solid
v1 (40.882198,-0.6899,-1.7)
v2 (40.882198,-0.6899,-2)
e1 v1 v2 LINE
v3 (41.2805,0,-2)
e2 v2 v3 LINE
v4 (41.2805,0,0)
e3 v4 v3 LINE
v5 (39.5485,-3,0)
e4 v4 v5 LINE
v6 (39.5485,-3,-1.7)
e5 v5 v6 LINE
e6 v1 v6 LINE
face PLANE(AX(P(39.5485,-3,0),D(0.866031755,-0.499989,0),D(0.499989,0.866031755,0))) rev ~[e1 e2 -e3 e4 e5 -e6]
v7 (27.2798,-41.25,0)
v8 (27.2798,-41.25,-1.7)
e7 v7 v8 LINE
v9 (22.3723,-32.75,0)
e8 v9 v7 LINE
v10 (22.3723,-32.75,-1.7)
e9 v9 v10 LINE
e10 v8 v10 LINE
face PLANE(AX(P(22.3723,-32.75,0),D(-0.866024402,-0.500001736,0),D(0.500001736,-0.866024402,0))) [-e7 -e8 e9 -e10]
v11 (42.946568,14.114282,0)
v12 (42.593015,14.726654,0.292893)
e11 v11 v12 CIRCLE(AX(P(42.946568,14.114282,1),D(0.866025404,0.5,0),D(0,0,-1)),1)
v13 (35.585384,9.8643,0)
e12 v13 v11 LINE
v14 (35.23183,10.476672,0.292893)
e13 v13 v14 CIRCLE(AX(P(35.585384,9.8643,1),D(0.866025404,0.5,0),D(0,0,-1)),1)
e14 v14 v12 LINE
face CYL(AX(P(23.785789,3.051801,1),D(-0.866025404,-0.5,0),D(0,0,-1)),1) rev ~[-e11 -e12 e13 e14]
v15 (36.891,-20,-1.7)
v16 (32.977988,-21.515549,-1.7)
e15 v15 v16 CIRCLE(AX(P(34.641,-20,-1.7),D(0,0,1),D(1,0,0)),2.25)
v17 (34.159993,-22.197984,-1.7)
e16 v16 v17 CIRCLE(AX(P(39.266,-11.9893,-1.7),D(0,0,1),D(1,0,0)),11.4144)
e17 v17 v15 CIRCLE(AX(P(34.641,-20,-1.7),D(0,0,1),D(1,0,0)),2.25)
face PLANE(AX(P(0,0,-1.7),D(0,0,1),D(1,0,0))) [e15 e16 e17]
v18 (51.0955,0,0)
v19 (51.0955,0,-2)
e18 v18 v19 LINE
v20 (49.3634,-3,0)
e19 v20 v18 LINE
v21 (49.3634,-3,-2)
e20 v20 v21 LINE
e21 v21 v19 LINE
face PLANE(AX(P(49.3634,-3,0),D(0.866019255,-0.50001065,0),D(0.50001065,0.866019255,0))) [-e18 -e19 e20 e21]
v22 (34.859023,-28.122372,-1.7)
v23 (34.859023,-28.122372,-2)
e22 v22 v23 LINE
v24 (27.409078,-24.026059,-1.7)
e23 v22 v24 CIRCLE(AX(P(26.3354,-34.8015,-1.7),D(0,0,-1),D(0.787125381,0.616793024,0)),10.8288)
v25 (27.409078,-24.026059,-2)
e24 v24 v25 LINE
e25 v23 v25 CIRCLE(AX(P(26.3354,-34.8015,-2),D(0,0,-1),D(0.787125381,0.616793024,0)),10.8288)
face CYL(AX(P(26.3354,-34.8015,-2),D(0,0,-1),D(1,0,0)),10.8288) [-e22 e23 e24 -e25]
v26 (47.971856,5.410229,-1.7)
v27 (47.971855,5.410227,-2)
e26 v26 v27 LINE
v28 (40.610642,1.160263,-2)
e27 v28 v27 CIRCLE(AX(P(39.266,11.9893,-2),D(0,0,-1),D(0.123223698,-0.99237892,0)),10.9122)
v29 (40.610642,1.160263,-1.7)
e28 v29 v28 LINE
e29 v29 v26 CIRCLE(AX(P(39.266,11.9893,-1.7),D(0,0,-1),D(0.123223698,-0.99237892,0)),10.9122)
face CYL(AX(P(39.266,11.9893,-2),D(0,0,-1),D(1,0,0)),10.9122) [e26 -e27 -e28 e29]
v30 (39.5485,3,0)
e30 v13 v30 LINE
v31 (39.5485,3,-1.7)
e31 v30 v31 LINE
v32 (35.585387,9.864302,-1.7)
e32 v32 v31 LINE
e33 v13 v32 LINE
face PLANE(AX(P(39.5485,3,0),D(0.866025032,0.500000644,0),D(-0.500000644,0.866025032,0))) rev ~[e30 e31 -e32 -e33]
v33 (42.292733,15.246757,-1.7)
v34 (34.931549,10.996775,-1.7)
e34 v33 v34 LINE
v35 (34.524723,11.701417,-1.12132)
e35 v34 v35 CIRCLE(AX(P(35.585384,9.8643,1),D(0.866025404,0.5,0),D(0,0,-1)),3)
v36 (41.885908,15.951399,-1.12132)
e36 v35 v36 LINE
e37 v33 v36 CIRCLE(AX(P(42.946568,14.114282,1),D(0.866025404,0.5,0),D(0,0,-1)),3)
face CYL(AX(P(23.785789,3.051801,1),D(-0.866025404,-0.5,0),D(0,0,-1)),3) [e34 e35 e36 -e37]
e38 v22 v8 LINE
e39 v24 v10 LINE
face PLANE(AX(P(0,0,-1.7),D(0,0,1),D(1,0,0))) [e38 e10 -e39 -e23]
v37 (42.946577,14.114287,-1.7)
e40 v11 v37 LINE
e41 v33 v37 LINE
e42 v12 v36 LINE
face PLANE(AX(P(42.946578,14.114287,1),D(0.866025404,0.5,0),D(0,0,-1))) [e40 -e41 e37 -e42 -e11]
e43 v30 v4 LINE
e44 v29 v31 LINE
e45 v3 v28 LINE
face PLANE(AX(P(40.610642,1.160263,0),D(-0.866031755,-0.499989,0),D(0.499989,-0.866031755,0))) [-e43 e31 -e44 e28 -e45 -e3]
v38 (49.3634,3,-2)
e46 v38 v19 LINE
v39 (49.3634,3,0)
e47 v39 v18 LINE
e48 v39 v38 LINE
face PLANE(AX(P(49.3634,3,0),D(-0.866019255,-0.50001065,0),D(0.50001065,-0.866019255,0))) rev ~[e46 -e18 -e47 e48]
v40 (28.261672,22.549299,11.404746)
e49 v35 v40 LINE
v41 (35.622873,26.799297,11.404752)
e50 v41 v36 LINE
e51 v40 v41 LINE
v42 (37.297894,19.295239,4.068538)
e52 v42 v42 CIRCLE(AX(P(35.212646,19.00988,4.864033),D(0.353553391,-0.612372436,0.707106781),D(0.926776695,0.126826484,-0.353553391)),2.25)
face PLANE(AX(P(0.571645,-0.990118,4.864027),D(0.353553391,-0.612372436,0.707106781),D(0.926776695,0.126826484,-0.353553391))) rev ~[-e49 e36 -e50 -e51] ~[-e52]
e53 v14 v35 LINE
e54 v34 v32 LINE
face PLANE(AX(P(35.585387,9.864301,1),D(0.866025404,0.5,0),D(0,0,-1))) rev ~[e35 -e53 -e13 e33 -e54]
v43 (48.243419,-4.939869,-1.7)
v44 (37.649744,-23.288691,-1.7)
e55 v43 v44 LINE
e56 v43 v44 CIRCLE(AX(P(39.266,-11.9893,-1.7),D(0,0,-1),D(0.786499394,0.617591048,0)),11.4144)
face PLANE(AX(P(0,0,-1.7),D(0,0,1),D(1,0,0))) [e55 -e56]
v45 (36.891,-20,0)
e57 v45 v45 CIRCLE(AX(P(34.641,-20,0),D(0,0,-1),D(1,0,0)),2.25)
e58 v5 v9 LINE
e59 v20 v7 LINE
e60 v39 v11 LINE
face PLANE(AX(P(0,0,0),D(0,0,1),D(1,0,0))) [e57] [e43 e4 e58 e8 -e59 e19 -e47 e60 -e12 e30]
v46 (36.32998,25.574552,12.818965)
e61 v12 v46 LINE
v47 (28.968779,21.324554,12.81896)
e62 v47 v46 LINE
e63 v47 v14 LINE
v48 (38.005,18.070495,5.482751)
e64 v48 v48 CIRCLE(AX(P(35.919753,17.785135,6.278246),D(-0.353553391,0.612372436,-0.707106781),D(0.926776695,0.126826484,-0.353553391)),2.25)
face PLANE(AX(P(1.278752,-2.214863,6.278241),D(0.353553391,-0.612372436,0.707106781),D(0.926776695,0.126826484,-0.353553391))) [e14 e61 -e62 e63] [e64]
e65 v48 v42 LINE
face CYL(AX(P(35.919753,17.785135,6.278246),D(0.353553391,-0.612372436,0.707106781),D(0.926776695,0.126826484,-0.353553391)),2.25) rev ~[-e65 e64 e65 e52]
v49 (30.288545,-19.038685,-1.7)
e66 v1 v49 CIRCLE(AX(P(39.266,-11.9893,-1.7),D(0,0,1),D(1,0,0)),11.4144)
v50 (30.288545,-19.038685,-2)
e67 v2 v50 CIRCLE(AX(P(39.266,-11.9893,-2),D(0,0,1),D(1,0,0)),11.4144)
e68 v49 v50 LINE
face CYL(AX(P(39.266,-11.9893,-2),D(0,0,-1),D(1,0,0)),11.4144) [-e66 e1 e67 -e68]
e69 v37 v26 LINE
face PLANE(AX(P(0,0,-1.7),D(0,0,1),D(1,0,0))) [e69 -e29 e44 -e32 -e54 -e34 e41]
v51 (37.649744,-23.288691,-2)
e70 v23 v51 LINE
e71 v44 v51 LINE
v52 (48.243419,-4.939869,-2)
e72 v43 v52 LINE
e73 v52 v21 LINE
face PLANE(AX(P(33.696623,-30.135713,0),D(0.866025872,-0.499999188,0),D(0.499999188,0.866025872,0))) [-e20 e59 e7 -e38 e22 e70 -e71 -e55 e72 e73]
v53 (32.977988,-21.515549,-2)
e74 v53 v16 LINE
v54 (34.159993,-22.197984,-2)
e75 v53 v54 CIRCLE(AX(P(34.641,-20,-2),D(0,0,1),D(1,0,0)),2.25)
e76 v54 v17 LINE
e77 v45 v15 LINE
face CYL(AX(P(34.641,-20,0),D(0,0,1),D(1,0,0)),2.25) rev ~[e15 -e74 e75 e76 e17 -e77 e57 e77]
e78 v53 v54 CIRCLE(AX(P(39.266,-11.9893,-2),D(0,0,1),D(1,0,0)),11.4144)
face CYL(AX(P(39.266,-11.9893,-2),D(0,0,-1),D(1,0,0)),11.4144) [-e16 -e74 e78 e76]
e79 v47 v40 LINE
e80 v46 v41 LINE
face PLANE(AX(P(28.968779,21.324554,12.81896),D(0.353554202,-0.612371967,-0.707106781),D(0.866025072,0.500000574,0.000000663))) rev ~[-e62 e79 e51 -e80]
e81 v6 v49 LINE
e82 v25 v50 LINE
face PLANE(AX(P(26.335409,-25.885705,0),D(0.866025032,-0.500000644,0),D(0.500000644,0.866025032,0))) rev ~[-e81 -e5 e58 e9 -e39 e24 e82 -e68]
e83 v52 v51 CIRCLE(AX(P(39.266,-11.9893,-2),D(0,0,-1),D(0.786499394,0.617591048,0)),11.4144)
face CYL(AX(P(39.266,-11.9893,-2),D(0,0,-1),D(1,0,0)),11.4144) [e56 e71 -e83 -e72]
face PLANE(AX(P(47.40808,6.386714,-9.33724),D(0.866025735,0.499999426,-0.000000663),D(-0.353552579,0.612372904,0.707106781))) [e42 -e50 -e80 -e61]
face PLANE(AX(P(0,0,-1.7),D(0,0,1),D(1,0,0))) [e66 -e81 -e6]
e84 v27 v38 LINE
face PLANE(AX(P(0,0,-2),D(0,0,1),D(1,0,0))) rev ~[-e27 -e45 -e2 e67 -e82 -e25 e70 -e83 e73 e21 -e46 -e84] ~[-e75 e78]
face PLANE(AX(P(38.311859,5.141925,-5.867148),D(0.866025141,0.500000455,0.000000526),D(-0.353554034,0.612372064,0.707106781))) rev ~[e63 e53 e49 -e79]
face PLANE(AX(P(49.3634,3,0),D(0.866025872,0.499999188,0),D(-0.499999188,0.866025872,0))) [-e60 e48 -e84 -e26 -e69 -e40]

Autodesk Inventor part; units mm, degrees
ref_plane "YZ Plane" through (0, 0, 0) normal (1, 0, 0) x (0, 1, 0)
ref_plane "XZ Plane" through (0, 0, 0) normal (0, 1, 0) x (-1, 0, 0)
sketch "Sketch1" plane through (0, 0, 0) normal (0, 0, 1) x (1, 0, 0)
  circle A0 centre (0, 0) radius 7.5
  line L0 (-21.2869, 0) -> (22.3896, 0) construction
  line L1 (0, 21.9302) -> (0, -69.0741) construction
  line L2 (24.9778, -67) -> (-24.9778, -67) construction
  line L3 (-17.5, -57) -> (17.5, -57)
  line L4 (17.5, -57) -> (17.5, -67)
  line L5 (17.5, -67) -> (-17.5, -67)
  line L6 (-17.5, -67) -> (-17.5, -57)
  line L7 (-37.5278, -67) -> (-18.5, -67)
  line L8 (-18.5, -67) -> (-18.5, -56)
  line L9 (-17.5, -62) -> (17.5, -62) construction
  line L10 (-18.5, -59) -> (-22.5, -59)
  line L11 (-22.5, -59) -> (-22.5, -65)
  line L12 (-22.5, -65) -> (-18.5, -65)
  line L13 (-18.5, -65) -> (-18.5, -59)
  line L14 (-17.5, -60) -> (-21.5, -60)
  line L15 (-21.5, -60) -> (-21.5, -64)
  line L16 (-21.5, -64) -> (-17.5, -64)
  line L17 (-17.5, -64) -> (-17.5, -60)
  line L18 (-18.5, -56) -> (-28.8675, -56)
  line L19 (17.5, -60) -> (21.5, -60)
  line L20 (21.5, -60) -> (21.5, -64)
  line L21 (21.5, -64) -> (17.5, -64)
  line L22 (17.5, -64) -> (17.5, -60)
  line L23 (18.5, -67) -> (18.5, -56)
  line L24 (18.5, -67) -> (37.5278, -67)
  line L25 (18.5, -65) -> (22.5, -65)
  line L26 (22.5, -65) -> (22.5, -59)
  line L27 (22.5, -59) -> (18.5, -59)
  line L28 (18.5, -59) -> (18.5, -65)
  line L29 (18.5, -56) -> (28.8675, -56)
  line L30 (-23.7704, -40) -> (28.6931, -40) construction
  line L31 (-17.1762, -35.75) -> (17.1762, -35.75)
  line L32 (-22.0836, -44.25) -> (22.0836, -44.25)
  circle A1 centre (0, -40) radius 2.25
  line L33 (-7.5, -16) -> (7.5, -16)
  line L34 (7.5, -16) -> (7.5, -21)
  line L35 (7.5, -26) -> (-7.5, -26)
  line L36 (-7.5, -26) -> (-7.5, -24)
  line L37 (7.5, -21) -> (-7.5, -21) construction
  line L38 (-7.5, -18) -> (-3.5, -18)
  line L39 (-3.5, -18) -> (-3.5, -21)
  line L40 (-3.5, -24) -> (-7.5, -24)
  line L41 (-7.5, -24) -> (-7.5, -23)
  line L42 (-8.5, -19) -> (-4.5, -19)
  line L43 (-4.5, -19) -> (-4.5, -23)
  line L44 (-4.5, -23) -> (-8.5, -23)
  line L45 (-8.5, -23) -> (-8.5, -19)
  line L46 (7.5, -18) -> (3.5, -18)
  line L47 (3.5, -18) -> (3.5, -21)
  line L48 (3.5, -24) -> (7.5, -24)
  line L49 (7.5, -24) -> (7.5, -18)
  line L50 (8.5, -19) -> (4.5, -19)
  line L51 (4.5, -19) -> (4.5, -23)
  line L52 (4.5, -23) -> (8.5, -23)
  line L53 (8.5, -23) -> (8.5, -19)
  line L54 (-9.815, -19) -> (-31.1769, -56)
  line L55 (-7.5056, -19) -> (-28.8675, -56)
  line L56 (7.5056, -19) -> (28.8675, -56)
  line L57 (-4.5, -21) -> (-8.5, -21)
  line L58 (4.5, -21) -> (8.5, -21)
  line L59 (-21.5, -62) -> (-17.5, -62)
  line L60 (17.5, -62) -> (21.5, -62)
  line L61 (-22.5, -62) -> (-18.5, -62)
  line L62 (22.5, -62) -> (18.5, -62)
  line L63 (-7.5, -21) -> (-3.5, -21)
  line L64 (3.5, -21) -> (7.5, -21)
  line L65 (-28.8675, -56) -> (-31.1769, -56)
  line L66 (28.8675, -56) -> (31.1769, -56)
  line L67 (-10.8853, -24.8539) -> (-12.6173, -23.8539)
  line L68 (10.8875, -24.8576) -> (12.6195, -23.8576)
  line L69 (7.5, -23) -> (7.5, -24)
  line L70 (-7.5, -23) -> (-7.5, -21)
  line L71 (-7.5, -24) -> (-7.5, -16)
  line L72 (7.5, -24) -> (7.5, -26)
  line L73 (-7.5, -21) -> (-7.5, -18)
  line L74 (-3.5, -21) -> (-3.5, -24)
  line L75 (3.5, -21) -> (3.5, -24)
  line L76 (7.5, -21) -> (7.5, -23)
  line L77 (-18.4752, 0) -> (-9.2376, 16)
  line L78 (-9.2376, 16) -> (9.2376, 16)
  line L79 (9.2376, 16) -> (18.4752, 0)
  line L80 (18.4752, 0) -> (9.2376, -16)
  line L81 (9.2376, -16) -> (-9.2376, -16)
  line L82 (-9.2376, -16) -> (-18.4752, 0)
  line L83 (-77.3649, 0) -> (-38.6825, 67) construction
  line L84 (-38.6825, 67) -> (38.6825, 67) construction
  line L85 (38.6825, 67) -> (77.3649, 0) construction
  line L86 (77.3649, 0) -> (38.6825, -67) construction
  line L87 (38.6825, -67) -> (-38.6825, -67) construction
  line L88 (-38.6825, -67) -> (-77.3649, 0) construction
  line L89 (-9.2376, -16) -> (-38.6825, -67) construction
  line L90 (9.2376, -16) -> (38.6825, -67) construction
  line L91 (0, -16.7974) -> (0, -26) construction
  line L92 (9.815, -19) -> (31.1769, -56)
  line L93 (-8.5, -19) -> (-9.815, -19)
  line L94 (8.5, -19) -> (9.815, -19)
  line L95 (-8.5, -23) -> (-9.815, -23)
  line L96 (8.5, -23) -> (9.815, -23)
  line L97 (-31.1769, -56) -> (-37.5278, -67)
  line L98 (31.1769, -56) -> (37.5278, -67)
  circle A2 centre (12.25, 0) radius 2.25
  circle A3 centre (6.125, 10.6088) radius 2.25
  circle A4 centre (-6.125, 10.6088) radius 2.25
  circle A5 centre (-12.25, 0) radius 2.25
  circle A6 centre (-6.125, -10.6088) radius 2.25
  circle A7 centre (6.125, -10.6088) radius 2.25
  line L99 (22.3723, -32.75) -> (39.5485, -3)
  line L100 (27.2798, -41.25) -> (49.3634, -3)
  circle A8 centre (34.641, -20) radius 2.25
  line L101 (39.5485, 3) -> (22.3723, 32.75)
  line L102 (49.3634, 3) -> (27.2798, 41.25)
  circle A9 centre (34.641, 20) radius 2.25
  line L103 (17.1762, 35.75) -> (-17.1762, 35.75)
  line L104 (22.0836, 44.25) -> (-22.0836, 44.25)
  circle A10 centre (0, 40) radius 2.25
  line L105 (-22.3723, 32.75) -> (-39.5485, 3)
  line L106 (-27.2798, 41.25) -> (-49.3634, 3)
  circle A11 centre (-34.641, 20) radius 2.25
  line L107 (-39.5485, -3) -> (-22.3723, -32.75)
  line L108 (-49.3634, -3) -> (-27.2798, -41.25)
  circle A12 centre (-34.641, -20) radius 2.25
  line L109 (22.3723, -32.75) -> (27.2798, -41.25)
  line L110 (49.3634, -3) -> (51.0955, 0)
  line L111 (49.3634, 3) -> (51.0955, 0)
  line L112 (39.5485, -3) -> (41.2805, 0)
  line L113 (39.5485, 3) -> (41.2805, 0)
  line L114 (7.3612, 4.25) -> (38.8268, 4.25)
  line L115 (7.3612, -4.25) -> (38.8268, -4.25)
  arc A13 (8.5, 0) -> (7.3612, 4.25) centre (0, 0) ccw
  arc A14 (7.3612, -4.25) -> (8.5, 0) centre (0, 0) ccw
  arc A15 (7.3612, 4.25) -> (7.3612, -4.25) centre (0, 0) ccw
  line L116 (22.3723, 32.75) -> (27.2798, 41.25)
  line L117 (35.5854, -9.8643) -> (42.9466, -14.1143)
  line L118 (42.9466, 14.1143) -> (35.5854, 9.8643)
  line L119 (26.3354, 25.8857) -> (33.6966, 30.1357)
  line L120 (26.3354, -25.8857) -> (33.6966, -30.1357)
  circle A16 centre (39.266, 11.9893) radius 10.9122
  circle A17 centre (39.266, -11.9893) radius 11.4144
  circle A18 centre (26.3354, -34.8015) radius 10.8288
  circle A19 centre (26.3354, 34.635) radius 11.4085
  point P0 (0, -57)
  point P1 (0, -67)
  point P2 (0, -62)
  point P3 (0, -21)
  dimension "d0" = 15
  dimension "d16" = 10
  dimension "d20" = 6
  dimension "d21" = 4
  dimension "d22" = 4
  dimension "d23" = 1
  dimension "d24" = 1
  dimension "d25" = 35
  dimension "d27" = 3
  dimension "d28" = 4
  dimension "d29" = 1
  dimension "d30" = 6
  dimension "d31" = 4
  dimension "d32" = 1
  dimension "d34" = 3
  dimension "d35" = 27
  dimension "d39" = 4.5
  dimension "d41" = 2
  dimension "d42" = 2
  dimension "d44" = 10
  dimension "d45" = 4
  dimension "d46" = 6
  dimension "d48" = 4
  dimension "d49" = 1
  dimension "d50" = 4
  dimension "d52" = 6
  dimension "d53" = 4
  dimension "d54" = 4
  dimension "d55" = 1
  dimension "d56" = 4
  dimension "d57" = 15
  dimension "d60" = 2
  dimension "d81" = 16
  dimension "d83" = 67
  dimension "d84" = 1
  dimension "d86" = 2
  dimension "d87" = 1
  dimension "d88" = 5
  dimension "d89" = 3
  dimension "d90" = 3
  dimension "d112" = 4.5
  dimension "d113" = 2.5
  dimension "d116" = 360
  dimension "d120" = 360
  dimension "d122" = 2
  dimension "d123" = 2
  dimension "d124" = 1
  dimension "d127" = 7
  dimension "d128" = 7
  dimension "d131" = 7
  dimension "d134" = 7
extrude "Extrusion8" add sketch "Sketch1" against normal blind 2 contours A18 L100 L120 L99 | L99 A17 A8 L100 A18 | L120 L100 L109 L99 | L99 L117 L100 A17 A8 | L99 L112 A17 L100 L117 | L112 L113 A16 L102 L111 L110 L100 A17 | L113 L101 L118 L102 A16 | A16 A9 L102 L118 L101 | L101 A19 L102 A16 A9 | L101 L119 L102 A19
bend part "Bend Part1" radius 1 angle 45 line through (42.9466, 14.1143, 0) along (-0.8660254, -0.5, 0) centre toward (0, 0, 1) moving side (-0.5, 0.8660254, 0) both sides no
ref_plane "Work Plane1" through (0, 0, -2) normal (0, 0, 1) x (1, 0, 0)
sketch "Sketch2" plane through (0, 0, -2) normal (0, 0, 1) x (1, 0, 0)
  circle A0 centre (26.3354, 34.635) radius 11.4085 projected
  circle A1 centre (39.266, 11.9893) radius 10.9122 projected
  circle A2 centre (39.266, -11.9893) radius 11.4144 projected
  circle A3 centre (26.3354, -34.8015) radius 10.8288 projected
  point P0 (0, 0)
extrude "Extrusion9" add sketch "Sketch2" along normal blind 0.3 contours A1 | A2 | A3
equation "\"d20\" = hinge_w"
equation "\"d21\" = hinge_d"
equation "\"d22\" = hinge_w - 2 * hinge_sp"
equation "\"d23\" = hinge_sp"
equation "\"d24\" = sp"
equation "\"d28\" = hinge_w - 2 * hinge_sp"
equation "\"d29\" = sp"
equation "\"d30\" = hinge_w"
equation "\"d31\" = hinge_d"
equation "\"d32\" = hinge_sp"
equation "\"d39\" = screw"
equation "\"d45\" = hinge_d"
equation "\"d46\" = hinge_w"
equation "\"d48\" = hinge_d"
equation "\"d49\" = hinge_sp"
equation "\"d50\" = hinge_w - 2 * hinge_sp"
equation "\"screw\" = 4.5"
equation "\"k\" = 0.4"
equation "\"sp\" = 1"
equation "\"d14\" = sp"
equation "\"d15\" = sp"
equation "\"d19\" = sp"
equation "\"hinge_d\" = 4"
equation "\"hinge_w\" = 6"
equation "\"hinge_sp\" = 1"
properties part number "RobotBase" material "Glass"
